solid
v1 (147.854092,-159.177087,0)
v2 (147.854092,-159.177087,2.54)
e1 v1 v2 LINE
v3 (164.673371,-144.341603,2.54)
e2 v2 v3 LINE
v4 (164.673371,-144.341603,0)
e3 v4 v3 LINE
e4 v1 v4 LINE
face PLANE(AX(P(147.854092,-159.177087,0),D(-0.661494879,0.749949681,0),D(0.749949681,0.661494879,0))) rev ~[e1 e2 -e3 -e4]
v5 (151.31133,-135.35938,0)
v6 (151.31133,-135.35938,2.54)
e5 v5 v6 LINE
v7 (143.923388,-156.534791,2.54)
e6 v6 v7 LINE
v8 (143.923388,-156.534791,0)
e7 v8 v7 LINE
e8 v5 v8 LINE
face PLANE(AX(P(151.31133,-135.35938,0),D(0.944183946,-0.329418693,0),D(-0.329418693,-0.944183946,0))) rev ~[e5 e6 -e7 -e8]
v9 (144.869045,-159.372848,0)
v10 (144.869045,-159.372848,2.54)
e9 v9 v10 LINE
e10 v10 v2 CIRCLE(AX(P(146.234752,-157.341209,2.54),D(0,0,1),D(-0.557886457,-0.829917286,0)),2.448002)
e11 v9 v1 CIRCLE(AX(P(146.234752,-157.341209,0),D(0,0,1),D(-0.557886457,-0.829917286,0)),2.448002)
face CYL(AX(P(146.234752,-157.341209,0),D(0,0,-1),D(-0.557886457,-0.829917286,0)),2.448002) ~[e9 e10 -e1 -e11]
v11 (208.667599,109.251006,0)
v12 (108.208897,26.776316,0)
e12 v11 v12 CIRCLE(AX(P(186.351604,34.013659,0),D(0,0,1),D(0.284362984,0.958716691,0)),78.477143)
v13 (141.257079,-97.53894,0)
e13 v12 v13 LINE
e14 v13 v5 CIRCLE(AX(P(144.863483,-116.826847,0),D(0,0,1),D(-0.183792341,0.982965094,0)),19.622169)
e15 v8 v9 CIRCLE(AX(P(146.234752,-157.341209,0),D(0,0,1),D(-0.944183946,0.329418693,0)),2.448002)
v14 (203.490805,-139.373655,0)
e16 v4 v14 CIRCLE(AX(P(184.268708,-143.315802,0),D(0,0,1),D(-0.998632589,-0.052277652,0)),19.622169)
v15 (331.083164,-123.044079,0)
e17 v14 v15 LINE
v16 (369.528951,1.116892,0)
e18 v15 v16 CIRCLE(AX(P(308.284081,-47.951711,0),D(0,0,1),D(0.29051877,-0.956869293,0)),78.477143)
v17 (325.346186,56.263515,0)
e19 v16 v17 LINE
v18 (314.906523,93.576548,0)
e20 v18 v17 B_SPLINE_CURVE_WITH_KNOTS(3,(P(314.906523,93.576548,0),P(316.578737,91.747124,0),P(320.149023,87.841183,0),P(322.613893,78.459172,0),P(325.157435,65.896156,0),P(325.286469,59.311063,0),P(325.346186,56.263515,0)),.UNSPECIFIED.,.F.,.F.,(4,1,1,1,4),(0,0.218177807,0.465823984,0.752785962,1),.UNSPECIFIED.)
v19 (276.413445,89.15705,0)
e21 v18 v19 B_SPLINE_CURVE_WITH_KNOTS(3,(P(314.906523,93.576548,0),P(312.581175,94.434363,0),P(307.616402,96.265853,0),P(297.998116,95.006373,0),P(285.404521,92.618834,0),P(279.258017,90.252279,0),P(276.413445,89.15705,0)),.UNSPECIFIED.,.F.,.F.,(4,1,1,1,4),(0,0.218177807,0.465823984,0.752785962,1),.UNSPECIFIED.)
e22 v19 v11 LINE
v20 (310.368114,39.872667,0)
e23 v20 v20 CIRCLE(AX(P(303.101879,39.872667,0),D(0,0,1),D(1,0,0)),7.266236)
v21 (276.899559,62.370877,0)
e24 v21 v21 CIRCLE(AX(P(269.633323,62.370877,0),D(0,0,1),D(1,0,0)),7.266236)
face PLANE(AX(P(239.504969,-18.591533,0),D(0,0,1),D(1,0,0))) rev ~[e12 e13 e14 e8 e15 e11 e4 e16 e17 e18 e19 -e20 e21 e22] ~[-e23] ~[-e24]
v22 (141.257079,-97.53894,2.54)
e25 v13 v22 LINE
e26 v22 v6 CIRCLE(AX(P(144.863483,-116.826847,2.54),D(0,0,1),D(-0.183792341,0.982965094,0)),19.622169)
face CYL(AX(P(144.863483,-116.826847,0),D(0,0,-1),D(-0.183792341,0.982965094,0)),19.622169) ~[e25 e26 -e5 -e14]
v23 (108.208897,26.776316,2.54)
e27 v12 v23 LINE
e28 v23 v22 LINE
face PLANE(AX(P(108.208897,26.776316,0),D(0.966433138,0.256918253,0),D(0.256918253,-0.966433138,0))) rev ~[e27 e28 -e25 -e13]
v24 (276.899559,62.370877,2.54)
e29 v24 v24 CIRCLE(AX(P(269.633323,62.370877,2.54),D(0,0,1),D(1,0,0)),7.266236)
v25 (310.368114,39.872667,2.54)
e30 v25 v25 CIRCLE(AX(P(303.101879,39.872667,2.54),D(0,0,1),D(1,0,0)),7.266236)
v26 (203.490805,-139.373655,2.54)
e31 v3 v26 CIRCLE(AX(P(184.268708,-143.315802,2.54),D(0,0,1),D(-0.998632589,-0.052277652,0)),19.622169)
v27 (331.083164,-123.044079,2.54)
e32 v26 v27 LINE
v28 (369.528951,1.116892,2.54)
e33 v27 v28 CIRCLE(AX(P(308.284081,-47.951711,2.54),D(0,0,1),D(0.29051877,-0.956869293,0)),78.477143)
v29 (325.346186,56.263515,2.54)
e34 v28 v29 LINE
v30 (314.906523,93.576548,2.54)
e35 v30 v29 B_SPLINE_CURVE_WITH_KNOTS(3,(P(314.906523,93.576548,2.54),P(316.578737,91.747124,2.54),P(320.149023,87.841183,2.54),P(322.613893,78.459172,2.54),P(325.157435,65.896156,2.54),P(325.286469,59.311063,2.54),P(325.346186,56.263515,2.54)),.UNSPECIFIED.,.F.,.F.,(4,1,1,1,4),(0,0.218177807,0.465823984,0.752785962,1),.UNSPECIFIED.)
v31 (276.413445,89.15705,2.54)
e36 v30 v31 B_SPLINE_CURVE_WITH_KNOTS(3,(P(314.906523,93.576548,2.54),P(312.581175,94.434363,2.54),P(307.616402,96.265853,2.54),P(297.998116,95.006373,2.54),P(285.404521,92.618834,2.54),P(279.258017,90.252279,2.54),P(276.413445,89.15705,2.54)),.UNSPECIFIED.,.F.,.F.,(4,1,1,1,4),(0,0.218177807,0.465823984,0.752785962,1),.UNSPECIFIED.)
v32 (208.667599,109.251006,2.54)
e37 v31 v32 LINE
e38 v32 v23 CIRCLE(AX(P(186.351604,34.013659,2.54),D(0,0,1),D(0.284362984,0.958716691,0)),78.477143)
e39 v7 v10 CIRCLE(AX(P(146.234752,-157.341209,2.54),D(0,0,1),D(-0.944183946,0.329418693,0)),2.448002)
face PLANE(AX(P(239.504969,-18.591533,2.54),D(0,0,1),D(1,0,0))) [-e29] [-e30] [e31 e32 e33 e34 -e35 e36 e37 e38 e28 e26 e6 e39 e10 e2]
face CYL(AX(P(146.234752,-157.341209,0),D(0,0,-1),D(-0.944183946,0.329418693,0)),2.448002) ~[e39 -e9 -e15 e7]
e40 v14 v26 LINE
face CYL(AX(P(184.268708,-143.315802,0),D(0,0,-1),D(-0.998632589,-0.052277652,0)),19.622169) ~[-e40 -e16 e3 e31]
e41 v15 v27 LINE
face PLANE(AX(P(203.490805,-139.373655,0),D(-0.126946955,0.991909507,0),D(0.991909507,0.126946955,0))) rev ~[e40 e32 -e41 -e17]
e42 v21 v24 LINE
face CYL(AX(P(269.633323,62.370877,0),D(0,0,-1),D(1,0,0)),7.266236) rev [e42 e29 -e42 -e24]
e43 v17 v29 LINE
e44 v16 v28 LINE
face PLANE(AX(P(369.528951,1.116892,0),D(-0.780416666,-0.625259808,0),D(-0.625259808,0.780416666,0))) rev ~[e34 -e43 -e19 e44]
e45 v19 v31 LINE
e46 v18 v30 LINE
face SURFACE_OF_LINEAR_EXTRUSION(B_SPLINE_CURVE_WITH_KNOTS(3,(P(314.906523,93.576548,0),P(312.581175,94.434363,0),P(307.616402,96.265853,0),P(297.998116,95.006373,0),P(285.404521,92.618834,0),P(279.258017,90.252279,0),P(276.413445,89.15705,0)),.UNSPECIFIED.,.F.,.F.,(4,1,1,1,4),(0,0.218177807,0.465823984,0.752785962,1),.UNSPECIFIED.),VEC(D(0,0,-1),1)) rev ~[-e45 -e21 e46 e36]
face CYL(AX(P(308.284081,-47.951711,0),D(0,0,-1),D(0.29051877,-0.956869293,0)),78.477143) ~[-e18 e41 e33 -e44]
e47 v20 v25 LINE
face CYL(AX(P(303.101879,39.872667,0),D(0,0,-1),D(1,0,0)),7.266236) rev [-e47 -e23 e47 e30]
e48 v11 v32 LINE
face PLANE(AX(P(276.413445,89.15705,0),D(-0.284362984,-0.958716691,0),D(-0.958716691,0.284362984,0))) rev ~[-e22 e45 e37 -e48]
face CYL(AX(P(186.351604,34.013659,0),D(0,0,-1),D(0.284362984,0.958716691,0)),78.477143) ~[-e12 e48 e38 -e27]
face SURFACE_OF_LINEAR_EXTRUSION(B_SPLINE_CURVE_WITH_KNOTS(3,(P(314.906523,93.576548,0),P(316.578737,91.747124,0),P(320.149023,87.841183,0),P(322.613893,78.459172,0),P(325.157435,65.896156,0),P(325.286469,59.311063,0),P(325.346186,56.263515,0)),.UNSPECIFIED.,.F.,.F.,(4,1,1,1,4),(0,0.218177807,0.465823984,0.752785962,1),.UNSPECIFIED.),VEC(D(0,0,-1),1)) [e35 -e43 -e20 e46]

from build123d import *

# Parameters (mm, degrees)
F0_R     = 9.082794509
F1_DEPTH = 3.175
F2_SCALE = 0.8


# Not quite as in the source:
# - a feature names something its author has since deleted; it is built from what else it names


with BuildPart() as f1:
    # F0 (on Top) → F1 (new body)
    with BuildSketch(Plane.XY):
        with BuildLine():
            Line((190.1853488741, -177.0173265019), (349.6757983606, -156.6053567409))
            ThreePointArc((349.6757983606, -156.6053567409), (414.8838780797, -91.7557523294), (397.7330321915, -1.4041428346))
            Line((397.7330321915, -1.4041428346), (342.5045750448, 67.5291355358))
            add(Edge.make_bspline(
                [(329.4549969886, 114.1704269865), (331.5452640948, 111.8836468118), (336.0081220097, 107.0012205554), (339.0892090613, 95.2737066428), (342.2686372384, 79.5699362539), (342.4299296899, 71.3385709799), (342.5045750448, 67.5291355358)],
                knots=[0, 0, 0, 0, 0.2181778066, 0.4658239841, 0.7527859619, 1, 1, 1, 1], degree=3))
            add(Edge.make_bspline(
                [(329.4549969886, 114.1704269865), (326.548311382, 115.2426951096), (320.3423462083, 117.5320581607), (308.3194887471, 115.9577079905), (292.5774945842, 112.9732838027), (284.8943646943, 110.0150910055), (281.3386498949, 108.6460538997)],
                knots=[0, 0, 0, 0, 0.2181778066, 0.4658239841, 0.7527859619, 1, 1, 1, 1], degree=3))
            Line((281.3386498949, 108.6460538997), (196.6563418366, 133.7634989848))
            ThreePointArc((196.6563418366, 133.7634989848), (106.5159411756, 115.5351413614), (71.0829640293, 30.6701368923))
            Line((71.0829640293, 30.6701368923), (112.3931918139, -124.7239333526))
            Line((112.3931918139, -124.7239333526), (124.9610056376, -171.9994834736))
            Line((124.9610056376, -171.9994834736), (128.3971803048, -184.9251243198))
            Line((128.3971803048, -184.9251243198), (141.6635569768, -183.2272616556))
            Line((141.6635569768, -183.2272616556), (190.1853488741, -177.0173265019))
        make_face()
        with Locations((314.69919144, 47.0405749589)):
            Circle(F0_R, mode=Mode.SUBTRACT)
        with Locations((272.863497229, 75.1633380718)):
            Circle(F0_R, mode=Mode.SUBTRACT)
        with BuildLine():
            ThreePointArc((112.3931918139, -124.7239333526), (93.1968044826, -155.1354338039), (124.9610056376, -171.9994834736))
            Line((124.9610056376, -171.9994834736), (112.3931918139, -124.7239333526))
        make_face()
        with BuildLine():
            ThreePointArc((141.6635569768, -183.2272616556), (169.2714467636, -206.2742802869), (190.1853488741, -177.0173265019))
            Line((190.1853488741, -177.0173265019), (141.6635569768, -183.2272616556))
        make_face()
        with BuildLine():
            Line((120.3224166543, -196.9372207683), (128.3971803048, -184.9251243198))
            Line((128.3971803048, -184.9251243198), (124.9610056376, -171.9994834736))
            Line((124.9610056376, -171.9994834736), (115.7260780635, -198.4687475134))
            ThreePointArc((115.7260780635, -198.4687475134), (117.6479584787, -196.5736854806), (120.3224166543, -196.9372207683))
        make_face()
        with BuildLine():
            Line((120.6394586436, -201.7716170066), (141.6635569768, -183.2272616556))
            Line((141.6635569768, -183.2272616556), (128.3971803048, -184.9251243198))
            Line((128.3971803048, -184.9251243198), (120.3224166543, -196.9372207683))
            ThreePointArc((120.3224166543, -196.9372207683), (121.6687259476, -199.2765231696), (120.6394586436, -201.7716170066))
        make_face()
        with BuildLine():
            ThreePointArc((116.9081491924, -202.0163180432), (118.8155291594, -202.53021243), (120.6394586436, -201.7716170066))
            ThreePointArc((120.6394586436, -201.7716170066), (121.6687259476, -199.2765231696), (120.3224166543, -196.9372207683))
            Line((120.3224166543, -196.9372207683), (116.9081491924, -202.0163180432))
        make_face()
        with BuildLine():
            Line((116.9081491924, -202.0163180432), (120.3224166543, -196.9372207683))
            ThreePointArc((120.3224166543, -196.9372207683), (117.6479584787, -196.5736854806), (115.7260780635, -198.4687475134))
            ThreePointArc((115.7260780635, -198.4687475134), (115.7121989982, -200.4440938504), (116.9081491924, -202.0163180432))
        make_face()
    extrude(amount=F1_DEPTH)


with BuildPart() as f1_1:
    # F2: moved
    add(f1.part.scale(F2_SCALE).moved(Location((51.3425254966, 2.2402065434, 0))))


solid = f1_1.part
